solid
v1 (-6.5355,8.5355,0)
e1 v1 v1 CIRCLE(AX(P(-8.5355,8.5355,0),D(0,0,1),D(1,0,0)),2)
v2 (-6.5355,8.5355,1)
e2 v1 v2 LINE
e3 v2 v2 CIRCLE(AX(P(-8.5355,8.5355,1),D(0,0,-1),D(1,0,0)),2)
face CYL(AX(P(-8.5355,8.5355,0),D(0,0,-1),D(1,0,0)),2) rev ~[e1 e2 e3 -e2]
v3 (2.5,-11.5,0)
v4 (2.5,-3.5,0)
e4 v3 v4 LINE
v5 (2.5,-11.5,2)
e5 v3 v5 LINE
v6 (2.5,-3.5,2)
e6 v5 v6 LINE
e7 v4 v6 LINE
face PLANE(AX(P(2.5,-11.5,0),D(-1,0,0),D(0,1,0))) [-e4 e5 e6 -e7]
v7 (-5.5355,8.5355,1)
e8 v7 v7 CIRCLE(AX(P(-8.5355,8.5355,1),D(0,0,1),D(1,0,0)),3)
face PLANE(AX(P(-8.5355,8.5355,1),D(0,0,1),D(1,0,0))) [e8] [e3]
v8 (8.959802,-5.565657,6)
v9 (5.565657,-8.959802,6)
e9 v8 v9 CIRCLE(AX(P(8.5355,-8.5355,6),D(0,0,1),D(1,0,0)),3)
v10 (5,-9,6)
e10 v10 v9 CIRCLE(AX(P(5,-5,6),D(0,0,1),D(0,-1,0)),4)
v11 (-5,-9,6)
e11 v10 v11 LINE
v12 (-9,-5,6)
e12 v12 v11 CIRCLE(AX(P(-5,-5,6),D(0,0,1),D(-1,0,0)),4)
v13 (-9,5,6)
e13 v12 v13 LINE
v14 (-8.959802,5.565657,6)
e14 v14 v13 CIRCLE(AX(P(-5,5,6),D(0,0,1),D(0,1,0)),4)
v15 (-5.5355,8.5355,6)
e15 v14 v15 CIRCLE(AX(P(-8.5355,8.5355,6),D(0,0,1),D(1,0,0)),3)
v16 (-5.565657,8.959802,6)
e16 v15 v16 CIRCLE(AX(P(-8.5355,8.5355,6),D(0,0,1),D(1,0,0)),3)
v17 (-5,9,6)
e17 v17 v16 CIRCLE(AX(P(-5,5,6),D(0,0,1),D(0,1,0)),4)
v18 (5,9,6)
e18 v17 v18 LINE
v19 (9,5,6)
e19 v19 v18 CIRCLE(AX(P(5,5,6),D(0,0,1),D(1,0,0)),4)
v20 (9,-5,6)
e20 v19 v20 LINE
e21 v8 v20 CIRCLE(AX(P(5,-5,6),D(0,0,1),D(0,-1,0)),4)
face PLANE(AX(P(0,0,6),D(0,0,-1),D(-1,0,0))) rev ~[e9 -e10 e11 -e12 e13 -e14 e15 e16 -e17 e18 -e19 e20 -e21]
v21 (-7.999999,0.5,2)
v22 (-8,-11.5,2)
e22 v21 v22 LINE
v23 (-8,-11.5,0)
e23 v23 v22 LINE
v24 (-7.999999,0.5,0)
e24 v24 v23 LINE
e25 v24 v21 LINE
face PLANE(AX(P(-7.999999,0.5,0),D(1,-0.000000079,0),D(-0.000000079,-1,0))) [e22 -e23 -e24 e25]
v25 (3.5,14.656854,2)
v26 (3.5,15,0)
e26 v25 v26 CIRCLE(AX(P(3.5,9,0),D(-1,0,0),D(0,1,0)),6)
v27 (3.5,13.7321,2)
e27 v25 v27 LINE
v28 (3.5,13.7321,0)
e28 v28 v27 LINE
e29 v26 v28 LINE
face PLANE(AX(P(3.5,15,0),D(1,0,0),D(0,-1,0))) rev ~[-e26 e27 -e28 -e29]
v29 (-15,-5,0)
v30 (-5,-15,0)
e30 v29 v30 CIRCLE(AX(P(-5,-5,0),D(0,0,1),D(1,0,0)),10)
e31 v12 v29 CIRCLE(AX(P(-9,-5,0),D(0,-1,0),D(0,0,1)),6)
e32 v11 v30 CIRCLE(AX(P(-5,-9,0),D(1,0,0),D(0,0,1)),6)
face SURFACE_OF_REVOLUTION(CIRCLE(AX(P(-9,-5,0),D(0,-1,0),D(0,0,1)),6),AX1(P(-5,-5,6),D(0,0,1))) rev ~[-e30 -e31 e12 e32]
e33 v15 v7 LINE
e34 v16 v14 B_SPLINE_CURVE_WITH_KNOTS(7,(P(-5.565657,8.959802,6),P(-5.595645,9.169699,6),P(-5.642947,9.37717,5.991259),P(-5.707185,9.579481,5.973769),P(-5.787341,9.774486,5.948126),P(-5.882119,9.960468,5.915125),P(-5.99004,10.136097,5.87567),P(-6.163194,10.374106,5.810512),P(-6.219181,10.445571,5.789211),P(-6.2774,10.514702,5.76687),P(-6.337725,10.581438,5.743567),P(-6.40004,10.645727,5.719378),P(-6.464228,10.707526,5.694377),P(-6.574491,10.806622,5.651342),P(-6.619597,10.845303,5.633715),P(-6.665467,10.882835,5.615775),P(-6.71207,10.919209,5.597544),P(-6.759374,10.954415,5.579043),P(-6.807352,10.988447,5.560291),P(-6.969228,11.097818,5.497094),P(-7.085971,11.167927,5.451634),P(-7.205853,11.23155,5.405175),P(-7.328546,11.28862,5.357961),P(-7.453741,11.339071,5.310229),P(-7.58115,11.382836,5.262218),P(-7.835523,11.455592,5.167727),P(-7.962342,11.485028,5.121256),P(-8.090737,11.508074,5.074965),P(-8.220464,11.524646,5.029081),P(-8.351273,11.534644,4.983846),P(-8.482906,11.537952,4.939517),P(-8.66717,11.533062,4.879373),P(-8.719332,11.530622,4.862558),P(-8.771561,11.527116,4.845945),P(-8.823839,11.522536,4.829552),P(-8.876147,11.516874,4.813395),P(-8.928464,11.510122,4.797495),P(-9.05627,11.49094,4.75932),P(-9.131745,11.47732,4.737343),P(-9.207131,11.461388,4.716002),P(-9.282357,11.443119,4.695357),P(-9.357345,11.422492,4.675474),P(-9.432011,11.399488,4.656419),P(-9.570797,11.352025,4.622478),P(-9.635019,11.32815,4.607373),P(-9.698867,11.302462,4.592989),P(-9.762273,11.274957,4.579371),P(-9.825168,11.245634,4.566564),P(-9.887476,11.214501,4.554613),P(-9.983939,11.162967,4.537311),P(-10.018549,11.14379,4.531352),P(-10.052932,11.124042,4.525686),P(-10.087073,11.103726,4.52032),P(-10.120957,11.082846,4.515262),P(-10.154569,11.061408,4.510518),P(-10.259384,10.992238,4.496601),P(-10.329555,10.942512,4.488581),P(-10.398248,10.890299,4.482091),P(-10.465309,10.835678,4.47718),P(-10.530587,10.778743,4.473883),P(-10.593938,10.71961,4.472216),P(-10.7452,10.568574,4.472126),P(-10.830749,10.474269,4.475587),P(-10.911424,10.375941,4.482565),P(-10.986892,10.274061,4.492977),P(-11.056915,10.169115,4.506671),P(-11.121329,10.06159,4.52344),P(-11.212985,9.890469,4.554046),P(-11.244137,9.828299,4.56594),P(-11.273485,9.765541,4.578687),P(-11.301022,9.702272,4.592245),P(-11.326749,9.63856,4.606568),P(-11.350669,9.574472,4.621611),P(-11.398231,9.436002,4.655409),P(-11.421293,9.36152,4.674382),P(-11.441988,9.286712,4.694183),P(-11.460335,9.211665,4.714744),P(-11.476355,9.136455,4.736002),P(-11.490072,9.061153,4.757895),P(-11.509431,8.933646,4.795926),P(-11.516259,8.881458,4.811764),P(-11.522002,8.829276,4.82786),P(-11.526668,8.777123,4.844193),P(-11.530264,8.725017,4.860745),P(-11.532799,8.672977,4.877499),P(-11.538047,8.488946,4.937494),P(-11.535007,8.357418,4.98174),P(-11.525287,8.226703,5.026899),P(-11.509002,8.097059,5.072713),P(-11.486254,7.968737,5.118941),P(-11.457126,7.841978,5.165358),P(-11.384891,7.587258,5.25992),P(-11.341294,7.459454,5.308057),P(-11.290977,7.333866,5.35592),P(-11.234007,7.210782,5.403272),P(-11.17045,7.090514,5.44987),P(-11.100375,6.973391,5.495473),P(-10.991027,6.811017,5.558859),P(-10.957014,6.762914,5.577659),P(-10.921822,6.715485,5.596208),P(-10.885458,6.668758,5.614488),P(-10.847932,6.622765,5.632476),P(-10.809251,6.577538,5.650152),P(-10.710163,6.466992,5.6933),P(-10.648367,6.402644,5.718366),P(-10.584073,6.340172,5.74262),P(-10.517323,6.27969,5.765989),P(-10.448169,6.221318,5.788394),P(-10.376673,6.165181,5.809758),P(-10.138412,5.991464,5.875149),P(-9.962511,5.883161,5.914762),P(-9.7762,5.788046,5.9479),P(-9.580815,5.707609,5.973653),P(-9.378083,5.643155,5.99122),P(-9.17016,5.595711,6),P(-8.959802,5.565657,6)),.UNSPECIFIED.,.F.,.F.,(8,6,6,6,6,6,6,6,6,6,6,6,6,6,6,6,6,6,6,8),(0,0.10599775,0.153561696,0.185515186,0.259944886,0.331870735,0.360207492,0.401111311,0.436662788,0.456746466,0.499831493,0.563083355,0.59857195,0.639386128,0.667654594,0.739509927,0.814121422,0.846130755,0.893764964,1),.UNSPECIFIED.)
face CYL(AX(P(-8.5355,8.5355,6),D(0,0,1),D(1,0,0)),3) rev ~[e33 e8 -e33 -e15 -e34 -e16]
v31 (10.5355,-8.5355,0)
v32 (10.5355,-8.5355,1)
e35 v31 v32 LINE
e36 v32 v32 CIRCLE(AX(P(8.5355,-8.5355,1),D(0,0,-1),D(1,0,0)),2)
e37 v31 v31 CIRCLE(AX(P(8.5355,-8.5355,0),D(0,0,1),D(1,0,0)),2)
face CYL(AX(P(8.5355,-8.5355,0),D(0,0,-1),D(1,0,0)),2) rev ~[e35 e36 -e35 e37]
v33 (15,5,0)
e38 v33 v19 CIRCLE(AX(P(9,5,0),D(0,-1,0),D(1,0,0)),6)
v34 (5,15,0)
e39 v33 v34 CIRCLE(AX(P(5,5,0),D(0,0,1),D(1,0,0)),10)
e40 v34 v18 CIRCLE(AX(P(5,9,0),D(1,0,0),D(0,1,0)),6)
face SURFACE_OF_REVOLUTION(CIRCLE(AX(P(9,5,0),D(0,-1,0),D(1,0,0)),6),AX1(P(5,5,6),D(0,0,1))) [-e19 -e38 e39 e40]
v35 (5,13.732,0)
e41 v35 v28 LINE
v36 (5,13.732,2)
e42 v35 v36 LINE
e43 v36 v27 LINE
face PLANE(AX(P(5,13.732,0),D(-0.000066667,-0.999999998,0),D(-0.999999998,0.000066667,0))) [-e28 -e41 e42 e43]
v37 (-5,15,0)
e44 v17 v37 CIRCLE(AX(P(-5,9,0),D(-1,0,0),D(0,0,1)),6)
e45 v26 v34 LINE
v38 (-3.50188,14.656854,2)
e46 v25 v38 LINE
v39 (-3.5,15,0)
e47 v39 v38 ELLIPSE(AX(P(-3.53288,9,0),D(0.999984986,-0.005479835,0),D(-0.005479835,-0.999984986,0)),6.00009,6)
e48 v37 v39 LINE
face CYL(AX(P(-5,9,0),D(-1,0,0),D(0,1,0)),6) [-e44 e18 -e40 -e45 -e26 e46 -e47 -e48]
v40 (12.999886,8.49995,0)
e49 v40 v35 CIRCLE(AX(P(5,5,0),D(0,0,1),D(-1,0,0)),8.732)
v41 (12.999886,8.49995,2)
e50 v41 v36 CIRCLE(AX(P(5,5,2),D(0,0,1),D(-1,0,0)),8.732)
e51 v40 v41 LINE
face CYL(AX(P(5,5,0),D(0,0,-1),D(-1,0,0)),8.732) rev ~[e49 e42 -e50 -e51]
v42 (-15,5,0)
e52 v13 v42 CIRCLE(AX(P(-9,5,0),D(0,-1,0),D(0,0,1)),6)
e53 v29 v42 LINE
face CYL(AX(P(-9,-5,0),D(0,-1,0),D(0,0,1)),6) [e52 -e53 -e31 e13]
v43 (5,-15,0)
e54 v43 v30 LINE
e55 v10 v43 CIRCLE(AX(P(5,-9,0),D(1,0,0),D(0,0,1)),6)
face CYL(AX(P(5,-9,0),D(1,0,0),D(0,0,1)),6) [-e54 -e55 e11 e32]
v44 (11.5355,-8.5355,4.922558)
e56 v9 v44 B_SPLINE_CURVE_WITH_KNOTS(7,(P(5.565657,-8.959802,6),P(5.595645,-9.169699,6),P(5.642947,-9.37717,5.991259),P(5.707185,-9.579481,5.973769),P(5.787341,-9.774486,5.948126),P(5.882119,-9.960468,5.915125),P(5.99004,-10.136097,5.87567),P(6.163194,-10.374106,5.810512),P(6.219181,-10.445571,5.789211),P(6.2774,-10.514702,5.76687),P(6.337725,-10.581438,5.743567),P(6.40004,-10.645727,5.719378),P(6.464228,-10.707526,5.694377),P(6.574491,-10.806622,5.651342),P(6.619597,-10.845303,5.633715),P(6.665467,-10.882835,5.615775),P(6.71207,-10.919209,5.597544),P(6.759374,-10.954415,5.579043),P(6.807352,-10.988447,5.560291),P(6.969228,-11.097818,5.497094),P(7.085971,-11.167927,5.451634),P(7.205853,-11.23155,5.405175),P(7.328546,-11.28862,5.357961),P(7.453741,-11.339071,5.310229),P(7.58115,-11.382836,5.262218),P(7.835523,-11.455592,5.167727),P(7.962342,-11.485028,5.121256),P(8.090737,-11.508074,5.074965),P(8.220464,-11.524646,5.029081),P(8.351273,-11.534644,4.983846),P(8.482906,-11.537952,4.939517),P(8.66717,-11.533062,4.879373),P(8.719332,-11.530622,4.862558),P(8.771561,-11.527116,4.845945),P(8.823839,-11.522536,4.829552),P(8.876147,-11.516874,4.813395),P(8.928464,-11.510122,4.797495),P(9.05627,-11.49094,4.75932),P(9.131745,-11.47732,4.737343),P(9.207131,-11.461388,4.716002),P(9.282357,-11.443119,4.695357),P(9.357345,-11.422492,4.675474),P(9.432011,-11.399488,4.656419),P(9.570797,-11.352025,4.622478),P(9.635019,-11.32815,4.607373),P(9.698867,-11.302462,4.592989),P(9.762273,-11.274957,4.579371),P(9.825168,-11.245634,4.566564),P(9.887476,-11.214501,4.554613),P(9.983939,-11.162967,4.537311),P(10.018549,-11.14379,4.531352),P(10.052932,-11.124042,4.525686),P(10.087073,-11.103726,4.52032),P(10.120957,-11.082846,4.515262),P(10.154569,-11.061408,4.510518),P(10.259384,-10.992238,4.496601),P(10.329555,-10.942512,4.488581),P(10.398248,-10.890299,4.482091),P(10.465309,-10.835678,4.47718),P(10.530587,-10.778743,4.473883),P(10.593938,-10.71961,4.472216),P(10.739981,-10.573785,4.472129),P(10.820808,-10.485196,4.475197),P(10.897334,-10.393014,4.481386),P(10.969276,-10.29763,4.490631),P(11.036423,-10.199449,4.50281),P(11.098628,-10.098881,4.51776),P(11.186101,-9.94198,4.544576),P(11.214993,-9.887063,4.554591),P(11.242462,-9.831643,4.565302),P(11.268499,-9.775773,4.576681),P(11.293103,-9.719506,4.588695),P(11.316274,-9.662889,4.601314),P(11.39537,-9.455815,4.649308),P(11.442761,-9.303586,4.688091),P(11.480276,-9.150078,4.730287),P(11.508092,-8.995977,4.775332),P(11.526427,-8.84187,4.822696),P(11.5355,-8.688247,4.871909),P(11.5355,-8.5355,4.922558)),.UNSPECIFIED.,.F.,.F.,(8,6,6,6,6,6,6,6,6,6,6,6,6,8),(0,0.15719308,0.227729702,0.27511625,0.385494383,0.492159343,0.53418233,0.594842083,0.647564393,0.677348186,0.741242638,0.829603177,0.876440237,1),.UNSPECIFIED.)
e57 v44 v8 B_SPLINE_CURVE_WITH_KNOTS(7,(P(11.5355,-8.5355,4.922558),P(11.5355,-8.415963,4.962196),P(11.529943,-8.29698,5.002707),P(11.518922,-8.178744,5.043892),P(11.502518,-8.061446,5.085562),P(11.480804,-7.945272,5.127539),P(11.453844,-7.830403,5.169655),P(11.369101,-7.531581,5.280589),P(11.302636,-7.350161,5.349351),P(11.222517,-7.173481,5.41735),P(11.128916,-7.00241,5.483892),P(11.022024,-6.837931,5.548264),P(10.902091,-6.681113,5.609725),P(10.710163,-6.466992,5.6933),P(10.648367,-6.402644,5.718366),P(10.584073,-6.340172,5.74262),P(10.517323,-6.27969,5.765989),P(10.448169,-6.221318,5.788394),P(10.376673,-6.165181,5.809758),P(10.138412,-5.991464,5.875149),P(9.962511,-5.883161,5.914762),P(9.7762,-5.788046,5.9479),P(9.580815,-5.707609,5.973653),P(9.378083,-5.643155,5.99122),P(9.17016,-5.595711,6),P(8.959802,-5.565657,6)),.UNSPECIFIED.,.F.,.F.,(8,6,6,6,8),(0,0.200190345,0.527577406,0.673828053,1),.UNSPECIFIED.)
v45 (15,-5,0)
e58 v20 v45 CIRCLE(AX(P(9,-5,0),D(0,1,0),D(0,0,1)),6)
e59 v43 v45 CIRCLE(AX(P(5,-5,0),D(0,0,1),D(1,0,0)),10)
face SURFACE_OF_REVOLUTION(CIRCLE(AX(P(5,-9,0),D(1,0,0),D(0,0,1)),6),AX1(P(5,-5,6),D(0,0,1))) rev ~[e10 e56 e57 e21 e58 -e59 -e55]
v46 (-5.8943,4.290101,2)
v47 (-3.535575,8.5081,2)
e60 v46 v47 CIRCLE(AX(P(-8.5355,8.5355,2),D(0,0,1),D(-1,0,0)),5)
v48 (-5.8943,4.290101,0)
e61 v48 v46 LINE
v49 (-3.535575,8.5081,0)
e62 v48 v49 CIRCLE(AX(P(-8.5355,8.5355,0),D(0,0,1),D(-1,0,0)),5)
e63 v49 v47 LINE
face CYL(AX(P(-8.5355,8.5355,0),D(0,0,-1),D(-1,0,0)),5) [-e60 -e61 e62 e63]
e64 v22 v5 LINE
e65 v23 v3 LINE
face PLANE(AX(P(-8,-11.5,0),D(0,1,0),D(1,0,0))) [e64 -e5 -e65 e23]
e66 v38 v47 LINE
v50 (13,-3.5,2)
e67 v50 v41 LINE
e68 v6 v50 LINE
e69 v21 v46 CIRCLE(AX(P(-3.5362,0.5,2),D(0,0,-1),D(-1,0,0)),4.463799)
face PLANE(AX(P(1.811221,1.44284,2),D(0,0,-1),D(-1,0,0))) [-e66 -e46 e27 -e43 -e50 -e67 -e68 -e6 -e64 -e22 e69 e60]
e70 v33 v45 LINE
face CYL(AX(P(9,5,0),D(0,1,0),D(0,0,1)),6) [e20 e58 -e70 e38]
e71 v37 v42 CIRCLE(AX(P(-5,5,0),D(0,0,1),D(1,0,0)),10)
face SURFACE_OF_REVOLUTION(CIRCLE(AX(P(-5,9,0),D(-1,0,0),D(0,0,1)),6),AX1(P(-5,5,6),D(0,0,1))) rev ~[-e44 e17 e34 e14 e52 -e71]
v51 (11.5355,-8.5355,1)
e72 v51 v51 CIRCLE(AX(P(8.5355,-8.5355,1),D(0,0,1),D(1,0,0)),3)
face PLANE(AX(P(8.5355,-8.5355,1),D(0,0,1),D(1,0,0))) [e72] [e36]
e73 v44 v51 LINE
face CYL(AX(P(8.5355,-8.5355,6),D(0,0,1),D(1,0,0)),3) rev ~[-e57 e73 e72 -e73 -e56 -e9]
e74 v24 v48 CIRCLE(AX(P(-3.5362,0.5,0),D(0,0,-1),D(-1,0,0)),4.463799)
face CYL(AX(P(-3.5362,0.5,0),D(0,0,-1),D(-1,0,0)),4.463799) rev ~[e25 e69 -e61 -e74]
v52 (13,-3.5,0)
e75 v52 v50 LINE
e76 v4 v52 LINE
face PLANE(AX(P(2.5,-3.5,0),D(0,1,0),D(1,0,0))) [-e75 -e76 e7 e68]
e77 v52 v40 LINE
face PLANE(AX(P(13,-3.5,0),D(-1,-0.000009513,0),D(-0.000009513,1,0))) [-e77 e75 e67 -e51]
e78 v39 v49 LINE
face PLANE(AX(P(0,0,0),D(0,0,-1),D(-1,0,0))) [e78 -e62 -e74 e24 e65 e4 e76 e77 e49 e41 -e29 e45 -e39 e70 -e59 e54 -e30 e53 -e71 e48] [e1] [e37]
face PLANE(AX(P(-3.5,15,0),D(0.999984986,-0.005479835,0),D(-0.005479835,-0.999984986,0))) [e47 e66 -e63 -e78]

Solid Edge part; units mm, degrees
sketch "Sketch1" plane through (0, 0, 0) normal (0, 0, 1) x (1, 0, 0)
  line L0 (-5, 15) -> (5, 15)
  arc A0 (15, 5) -> (5, 15) centre (5, 5) ccw
  line L1 (15, 5) -> (15, -5)
  arc A1 (5, -15) -> (15, -5) centre (5, -5) ccw
  line L2 (5, -15) -> (-5, -15)
  arc A2 (-15, -5) -> (-5, -15) centre (-5, -5) ccw
  line L3 (-15, -5) -> (-15, 5)
  arc A3 (-5, 15) -> (-15, 5) centre (-5, 5) ccw
extrude "Protrusion1" add sketch "Sketch1" along normal blind 6
sketch "Sketch2" plane through (0, 0, 0) normal (0, 0, -1) x (-1, 0, 0)
  arc A0 (8, 0.5) -> (5.8943, 4.2901) centre (3.5362, 0.5) ccw
  line L0 (3.5, 15) -> (3.5356, 8.5081)
  line L1 (-3.5, 15) -> (3.5, 15)
  line L2 (-3.5, 15) -> (-3.5, 13.7321)
  line L3 (-5, 13.7321) -> (-3.5, 13.7321)
  arc A1 (-13, 8.5) -> (-5, 13.7321) centre (-5, 5) cw
  line L4 (-13, -3.5) -> (-13, 8.5)
  line L5 (-2.5, -3.5) -> (-13, -3.5)
  line L6 (-2.5, -11.5) -> (-2.5, -3.5)
  line L7 (8, -11.5) -> (-2.5, -11.5)
  line L8 (8, 0.5) -> (8, -11.5)
  arc A2 (5.8943, 4.29) -> (3.5356, 8.5081) centre (8.5355, 8.5355) cw
extrude "VaciadoExtruido_1" cut sketch "Sketch2" against normal blind 2
fillet "Redondeo_2" radius 6 7 edges at (-12.0711, -12.0711, 6) (-12.0711, 12.0711, 6) (0, 15, 6) (12.0711, 12.0711, 6) (12.0711, -12.0711, 6) (15, 0, 6) (0, -15, 6)
sketch "Sketch3" plane through (0, 0, 0) normal (0, 0, 1) x (1, 0, 0)
  circle A0 centre (-8.5355, 8.5355) radius 2
  circle A1 centre (8.5355, -8.5355) radius 2
extrude "Cutout1" cut sketch "Sketch3" along normal through all
sketch "Sketch4" plane through (0, 0, 6) normal (0, 0, 1) x (1, 0, 0)
  circle A0 centre (-8.5355, 8.5355) radius 3
  circle A1 centre (8.5355, -8.5355) radius 3
extrude "VaciadoExtruido_3" cut sketch "Sketch4" against normal blind 5
